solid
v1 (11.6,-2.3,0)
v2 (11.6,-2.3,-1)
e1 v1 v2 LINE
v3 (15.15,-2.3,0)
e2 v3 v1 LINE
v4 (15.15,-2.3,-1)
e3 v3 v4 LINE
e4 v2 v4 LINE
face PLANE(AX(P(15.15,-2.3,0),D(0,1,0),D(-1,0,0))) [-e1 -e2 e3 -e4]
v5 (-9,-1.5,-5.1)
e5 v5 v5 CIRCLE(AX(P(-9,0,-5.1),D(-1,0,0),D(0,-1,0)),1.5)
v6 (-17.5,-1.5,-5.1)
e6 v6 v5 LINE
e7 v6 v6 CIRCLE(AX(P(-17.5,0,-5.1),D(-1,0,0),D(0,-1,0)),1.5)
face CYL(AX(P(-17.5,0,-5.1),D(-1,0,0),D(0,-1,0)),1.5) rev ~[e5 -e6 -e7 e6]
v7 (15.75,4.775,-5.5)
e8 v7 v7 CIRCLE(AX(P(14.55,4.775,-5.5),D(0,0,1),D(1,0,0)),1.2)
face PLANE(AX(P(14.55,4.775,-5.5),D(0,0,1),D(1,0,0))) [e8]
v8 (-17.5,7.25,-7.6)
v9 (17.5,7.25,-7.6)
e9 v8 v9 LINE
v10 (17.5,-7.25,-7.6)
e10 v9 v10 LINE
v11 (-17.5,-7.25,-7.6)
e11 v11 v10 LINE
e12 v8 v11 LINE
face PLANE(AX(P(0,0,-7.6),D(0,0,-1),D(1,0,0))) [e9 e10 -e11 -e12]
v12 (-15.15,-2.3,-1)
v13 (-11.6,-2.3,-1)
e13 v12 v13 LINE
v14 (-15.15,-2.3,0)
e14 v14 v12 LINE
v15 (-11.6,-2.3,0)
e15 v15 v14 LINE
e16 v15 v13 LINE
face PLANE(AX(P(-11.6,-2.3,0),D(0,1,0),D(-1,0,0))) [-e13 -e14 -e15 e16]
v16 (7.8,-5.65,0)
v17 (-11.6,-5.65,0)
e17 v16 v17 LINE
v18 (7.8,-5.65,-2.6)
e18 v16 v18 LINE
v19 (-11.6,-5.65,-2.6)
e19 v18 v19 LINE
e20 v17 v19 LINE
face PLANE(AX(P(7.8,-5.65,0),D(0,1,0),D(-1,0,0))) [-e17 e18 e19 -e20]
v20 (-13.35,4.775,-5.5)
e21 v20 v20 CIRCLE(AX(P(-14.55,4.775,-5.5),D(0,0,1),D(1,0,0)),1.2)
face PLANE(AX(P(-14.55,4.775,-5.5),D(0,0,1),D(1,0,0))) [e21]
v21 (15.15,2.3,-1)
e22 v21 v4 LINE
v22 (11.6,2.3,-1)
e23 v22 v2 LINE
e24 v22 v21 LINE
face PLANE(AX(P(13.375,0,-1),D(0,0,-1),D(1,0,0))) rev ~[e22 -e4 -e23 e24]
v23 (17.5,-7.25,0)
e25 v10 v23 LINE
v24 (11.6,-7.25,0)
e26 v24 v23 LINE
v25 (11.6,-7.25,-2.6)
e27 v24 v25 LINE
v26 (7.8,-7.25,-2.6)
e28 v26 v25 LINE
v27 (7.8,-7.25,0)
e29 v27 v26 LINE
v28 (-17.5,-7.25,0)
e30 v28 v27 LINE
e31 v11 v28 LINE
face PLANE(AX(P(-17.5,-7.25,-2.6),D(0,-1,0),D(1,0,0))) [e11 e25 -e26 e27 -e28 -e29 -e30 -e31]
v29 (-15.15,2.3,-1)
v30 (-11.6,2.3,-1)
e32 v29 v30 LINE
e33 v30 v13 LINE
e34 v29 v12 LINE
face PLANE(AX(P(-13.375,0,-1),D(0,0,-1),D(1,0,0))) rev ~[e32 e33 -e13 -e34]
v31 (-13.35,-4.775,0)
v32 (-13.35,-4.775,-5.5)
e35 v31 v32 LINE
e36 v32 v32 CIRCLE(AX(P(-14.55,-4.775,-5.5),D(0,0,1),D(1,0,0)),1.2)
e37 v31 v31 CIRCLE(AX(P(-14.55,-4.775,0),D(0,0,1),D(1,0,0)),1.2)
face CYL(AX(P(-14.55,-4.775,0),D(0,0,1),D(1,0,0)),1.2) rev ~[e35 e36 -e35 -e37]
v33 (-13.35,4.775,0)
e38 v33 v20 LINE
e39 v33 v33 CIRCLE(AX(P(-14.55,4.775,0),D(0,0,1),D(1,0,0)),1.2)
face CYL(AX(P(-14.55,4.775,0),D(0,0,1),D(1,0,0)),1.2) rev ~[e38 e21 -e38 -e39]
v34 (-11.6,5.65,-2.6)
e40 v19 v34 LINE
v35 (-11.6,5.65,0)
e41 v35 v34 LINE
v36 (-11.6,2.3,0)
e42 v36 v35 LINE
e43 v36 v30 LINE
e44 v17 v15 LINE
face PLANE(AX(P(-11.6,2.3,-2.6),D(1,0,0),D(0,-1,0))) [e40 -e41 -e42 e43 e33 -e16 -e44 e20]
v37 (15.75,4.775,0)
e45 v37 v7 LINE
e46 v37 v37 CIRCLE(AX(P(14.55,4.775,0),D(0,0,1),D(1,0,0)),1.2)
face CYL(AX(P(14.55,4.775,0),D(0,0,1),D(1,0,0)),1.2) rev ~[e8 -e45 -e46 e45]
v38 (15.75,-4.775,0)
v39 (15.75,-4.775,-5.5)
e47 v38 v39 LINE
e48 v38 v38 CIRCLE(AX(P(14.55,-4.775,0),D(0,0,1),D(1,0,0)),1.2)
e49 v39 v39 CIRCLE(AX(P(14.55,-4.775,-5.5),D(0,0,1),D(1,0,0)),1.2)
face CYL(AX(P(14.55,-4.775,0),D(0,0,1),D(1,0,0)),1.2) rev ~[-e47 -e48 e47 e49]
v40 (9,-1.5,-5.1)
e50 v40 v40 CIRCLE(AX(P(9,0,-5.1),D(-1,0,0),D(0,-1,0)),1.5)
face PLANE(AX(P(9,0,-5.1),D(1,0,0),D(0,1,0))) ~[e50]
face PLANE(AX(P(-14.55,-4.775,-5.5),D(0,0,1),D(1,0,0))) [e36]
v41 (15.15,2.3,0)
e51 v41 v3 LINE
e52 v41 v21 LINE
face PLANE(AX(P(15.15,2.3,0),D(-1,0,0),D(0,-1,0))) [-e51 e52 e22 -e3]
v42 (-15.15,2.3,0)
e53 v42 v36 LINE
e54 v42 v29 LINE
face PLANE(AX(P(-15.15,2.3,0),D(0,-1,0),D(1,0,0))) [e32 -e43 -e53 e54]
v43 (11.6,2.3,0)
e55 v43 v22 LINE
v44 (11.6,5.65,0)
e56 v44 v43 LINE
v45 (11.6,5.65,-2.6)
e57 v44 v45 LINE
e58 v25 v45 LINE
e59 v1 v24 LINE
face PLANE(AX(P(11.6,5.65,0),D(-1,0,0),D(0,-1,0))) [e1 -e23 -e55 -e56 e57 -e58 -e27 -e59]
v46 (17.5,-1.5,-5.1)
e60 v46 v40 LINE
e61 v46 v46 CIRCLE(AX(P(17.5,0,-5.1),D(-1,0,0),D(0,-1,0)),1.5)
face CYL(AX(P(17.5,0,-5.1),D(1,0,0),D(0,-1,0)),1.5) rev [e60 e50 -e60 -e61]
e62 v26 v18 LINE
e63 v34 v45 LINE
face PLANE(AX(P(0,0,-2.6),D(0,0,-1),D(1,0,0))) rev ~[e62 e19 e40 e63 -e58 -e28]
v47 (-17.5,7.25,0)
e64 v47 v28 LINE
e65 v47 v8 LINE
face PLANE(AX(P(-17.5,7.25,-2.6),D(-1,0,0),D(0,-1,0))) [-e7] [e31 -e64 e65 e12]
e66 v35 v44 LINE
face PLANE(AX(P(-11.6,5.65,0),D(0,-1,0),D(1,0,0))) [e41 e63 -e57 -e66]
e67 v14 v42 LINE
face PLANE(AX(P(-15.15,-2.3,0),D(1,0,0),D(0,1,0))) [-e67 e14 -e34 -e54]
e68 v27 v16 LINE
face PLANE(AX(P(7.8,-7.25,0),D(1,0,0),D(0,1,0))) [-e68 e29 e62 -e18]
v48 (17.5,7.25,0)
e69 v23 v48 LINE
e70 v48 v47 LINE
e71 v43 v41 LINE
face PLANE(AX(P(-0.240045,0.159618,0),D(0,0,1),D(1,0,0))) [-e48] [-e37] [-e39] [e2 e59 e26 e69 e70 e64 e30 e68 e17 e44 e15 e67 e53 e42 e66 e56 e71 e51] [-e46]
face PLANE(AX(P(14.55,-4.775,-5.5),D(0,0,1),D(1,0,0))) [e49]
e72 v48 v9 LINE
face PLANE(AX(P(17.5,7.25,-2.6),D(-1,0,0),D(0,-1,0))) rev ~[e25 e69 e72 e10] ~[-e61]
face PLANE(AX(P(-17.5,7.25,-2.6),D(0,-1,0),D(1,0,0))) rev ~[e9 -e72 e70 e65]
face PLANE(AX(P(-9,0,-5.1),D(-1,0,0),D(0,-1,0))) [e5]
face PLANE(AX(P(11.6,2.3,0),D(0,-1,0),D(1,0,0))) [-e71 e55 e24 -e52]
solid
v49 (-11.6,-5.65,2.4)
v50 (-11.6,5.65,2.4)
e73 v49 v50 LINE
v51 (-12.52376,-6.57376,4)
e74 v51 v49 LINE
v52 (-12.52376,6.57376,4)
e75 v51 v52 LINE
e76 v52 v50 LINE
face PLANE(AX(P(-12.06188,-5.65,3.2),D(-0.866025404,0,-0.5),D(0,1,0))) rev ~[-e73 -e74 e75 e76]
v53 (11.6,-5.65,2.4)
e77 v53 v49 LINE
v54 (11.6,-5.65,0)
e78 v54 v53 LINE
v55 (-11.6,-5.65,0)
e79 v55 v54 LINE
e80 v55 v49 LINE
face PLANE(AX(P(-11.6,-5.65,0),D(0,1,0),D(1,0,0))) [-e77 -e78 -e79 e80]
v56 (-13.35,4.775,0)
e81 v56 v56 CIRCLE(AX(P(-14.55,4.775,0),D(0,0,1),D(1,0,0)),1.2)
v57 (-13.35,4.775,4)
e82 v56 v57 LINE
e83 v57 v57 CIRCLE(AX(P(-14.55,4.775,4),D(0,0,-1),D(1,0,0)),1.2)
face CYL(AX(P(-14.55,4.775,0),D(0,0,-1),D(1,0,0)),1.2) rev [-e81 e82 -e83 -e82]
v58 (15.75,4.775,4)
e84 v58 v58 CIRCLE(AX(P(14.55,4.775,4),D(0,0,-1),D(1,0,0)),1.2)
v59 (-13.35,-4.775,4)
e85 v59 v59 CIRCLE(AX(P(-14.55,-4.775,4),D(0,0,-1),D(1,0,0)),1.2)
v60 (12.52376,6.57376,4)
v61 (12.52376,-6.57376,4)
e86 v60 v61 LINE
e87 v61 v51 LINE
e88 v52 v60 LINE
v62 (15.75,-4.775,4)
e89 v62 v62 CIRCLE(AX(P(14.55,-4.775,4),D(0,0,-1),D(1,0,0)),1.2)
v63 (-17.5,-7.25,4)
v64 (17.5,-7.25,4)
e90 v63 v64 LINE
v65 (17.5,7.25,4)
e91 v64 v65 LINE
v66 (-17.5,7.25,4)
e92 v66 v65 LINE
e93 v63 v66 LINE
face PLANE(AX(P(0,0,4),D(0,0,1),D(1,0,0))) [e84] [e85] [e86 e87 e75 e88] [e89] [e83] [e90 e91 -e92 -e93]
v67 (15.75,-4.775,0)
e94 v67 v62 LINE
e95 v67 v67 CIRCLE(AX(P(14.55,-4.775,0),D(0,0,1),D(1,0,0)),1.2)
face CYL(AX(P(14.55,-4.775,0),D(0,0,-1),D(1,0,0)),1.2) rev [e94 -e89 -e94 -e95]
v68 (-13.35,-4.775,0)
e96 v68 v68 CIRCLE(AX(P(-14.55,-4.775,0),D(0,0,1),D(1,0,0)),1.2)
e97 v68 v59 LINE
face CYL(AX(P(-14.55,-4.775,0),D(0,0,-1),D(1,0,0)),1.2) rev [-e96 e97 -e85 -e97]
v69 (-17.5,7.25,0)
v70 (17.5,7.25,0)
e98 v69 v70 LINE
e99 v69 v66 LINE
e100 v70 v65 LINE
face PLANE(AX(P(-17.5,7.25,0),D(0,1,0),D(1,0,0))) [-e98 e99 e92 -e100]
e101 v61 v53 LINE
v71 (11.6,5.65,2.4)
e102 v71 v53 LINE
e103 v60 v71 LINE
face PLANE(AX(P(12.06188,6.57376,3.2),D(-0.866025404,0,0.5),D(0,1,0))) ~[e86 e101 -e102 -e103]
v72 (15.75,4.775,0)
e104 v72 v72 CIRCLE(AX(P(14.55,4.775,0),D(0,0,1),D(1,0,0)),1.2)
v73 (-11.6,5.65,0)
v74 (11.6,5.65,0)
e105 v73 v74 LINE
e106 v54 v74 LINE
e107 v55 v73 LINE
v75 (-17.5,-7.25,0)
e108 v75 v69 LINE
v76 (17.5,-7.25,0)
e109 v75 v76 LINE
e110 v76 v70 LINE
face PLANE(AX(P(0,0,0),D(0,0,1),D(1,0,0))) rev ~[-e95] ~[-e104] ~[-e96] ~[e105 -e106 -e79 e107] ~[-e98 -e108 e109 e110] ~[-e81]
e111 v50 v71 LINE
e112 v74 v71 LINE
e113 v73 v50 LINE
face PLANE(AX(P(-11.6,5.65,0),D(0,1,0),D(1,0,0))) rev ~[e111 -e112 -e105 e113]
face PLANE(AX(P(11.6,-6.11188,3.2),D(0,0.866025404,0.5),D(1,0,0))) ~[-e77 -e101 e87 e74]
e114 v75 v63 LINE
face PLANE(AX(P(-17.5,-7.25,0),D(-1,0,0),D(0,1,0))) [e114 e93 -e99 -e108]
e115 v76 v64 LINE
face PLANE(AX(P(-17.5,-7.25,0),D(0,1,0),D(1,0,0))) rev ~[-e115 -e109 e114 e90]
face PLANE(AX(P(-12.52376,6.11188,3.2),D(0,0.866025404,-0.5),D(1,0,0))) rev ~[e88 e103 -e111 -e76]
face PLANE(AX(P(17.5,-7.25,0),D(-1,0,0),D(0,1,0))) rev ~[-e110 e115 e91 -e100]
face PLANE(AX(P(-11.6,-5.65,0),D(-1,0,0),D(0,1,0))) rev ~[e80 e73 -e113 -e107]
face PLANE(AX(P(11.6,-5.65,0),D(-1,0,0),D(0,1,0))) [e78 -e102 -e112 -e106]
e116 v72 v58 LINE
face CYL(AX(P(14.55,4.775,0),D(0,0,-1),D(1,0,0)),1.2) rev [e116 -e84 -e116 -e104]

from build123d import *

# Parameters (mm, degrees)
F1_DEPTH       = 2.6
F2_W           = 3.55
F2_H           = 4.6
F3_DEPTH       = 1.6
F4_W           = 35
F4_H           = 14.5
F5_DEPTH       = 5
F6_R           = 1.5
F7_DEPTH       = 8.5
F8_W           = 35
F8_H           = 14.5
F8_W_2         = 23.2
F8_H_2         = 11.3
F9_DEPTH       = 4
F10_R          = 1.2
F11_DEPTH      = 5.5
F11_DEPTH_BACK = 4.001
F12_C1_SIZE2   = 1.6
F12_C1_SIZE    = 0.9237604307
F12_C2_SIZE2   = 1.6
F12_C2_SIZE    = 0.9237604307
F12_C3_SIZE2   = 1.6
F12_C3_SIZE    = 0.9237604307
F12_C4_SIZE2   = 1.6
F12_C4_SIZE    = 0.9237604307


# Not quite as in the source:
# - a pattern or mirror of a feature is missing from the dataset's text; its kind, count and spacing are read off the source's solid


with BuildPart() as f1:
    # F0 (on Top) → F1 (new body)
    with BuildSketch(Plane.XY):
        Polygon((17.5, -7.25), (17.5, 7.25), (-17.5, 7.25), (-17.5, -7.25), (7.8, -7.25), (7.8, -5.65), (-11.6, -5.65), (-11.6, -2.3), (-15.15, -2.3), (-15.15, 2.3), (-11.6, 2.3), (-11.6, 5.65), (11.6, 5.65), (11.6, 2.3), (15.15, 2.3), (15.15, -2.3), (11.6, -2.3), (11.6, -7.25), align=None)
    extrude(amount=-F1_DEPTH)

    # F2 (on face) → F3 (join, through all)
    with BuildSketch(Plane(origin=(0, 0, -2.6), x_dir=(1, 0, 0), z_dir=(0, 0, -1))):
        with Locations((-13.375, 0)):
            Rectangle(F2_W, F2_H)
        with Locations((13.375, 0)):
            Rectangle(F2_W, F2_H)
    extrude(amount=-F3_DEPTH)

    # F4 (on face) → F5 (join)
    with BuildSketch(Plane(origin=(0, 0, -2.6), x_dir=(1, 0, 0), z_dir=(0, 0, -1))):
        Rectangle(F4_W, F4_H)
    extrude(amount=F5_DEPTH)

    # F6 (on face) → F7 (cut)
    with BuildSketch(Plane(origin=(-17.5, 0, 0), x_dir=(0, -1, 0), z_dir=(-1, 0, 0))):
        with Locations((0, -5.1)):
            Circle(F6_R)
    f7 = extrude(amount=-F7_DEPTH, mode=Mode.SUBTRACT)

    # F7_copies: F7 across plane
    add(f7.mirror(Plane(origin=(0, 0, 0), x_dir=(0, 0, 1), z_dir=(1, 0, 0))), mode=Mode.SUBTRACT)


with BuildPart() as f9:
    # F8 (on face) → F9 (new body)
    with BuildSketch(Plane.XY):
        Rectangle(F8_W, F8_H)
        Rectangle(F8_W_2, F8_H_2, mode=Mode.SUBTRACT)
    extrude(amount=F9_DEPTH)


with BuildPart() as f11_tool:
    # F10 (on face) → F11 (new body, two sides)
    with BuildSketch(Plane.XY) as f11_sk:
        with Locations((-14.55, 4.775)):
            Circle(F10_R)
        with Locations((14.55, 4.775)):
            Circle(F10_R)
        with Locations((-14.55, -4.775)):
            Circle(F10_R)
        with Locations((14.55, -4.775)):
            Circle(F10_R)
    extrude(amount=-F11_DEPTH)
    extrude(f11_sk.sketch, amount=F11_DEPTH_BACK)


with BuildPart() as f1_1:
    add(f1.part)

    # F11: cut by f11_tool
    add(f11_tool.part, mode=Mode.SUBTRACT)


with BuildPart() as f9_1:
    add(f9.part)

    # F11: cut by f11_tool
    add(f11_tool.part, mode=Mode.SUBTRACT)

    # F12: chamfer of 1.6 x 0.9237604307 on 4 edges, made by hand

    # F12_c1
    f12_c1_edges = [f9_1.edges().sort_by_distance(p)[0] for p in [
        (-11.6, 0, 4),
    ]]
    f12_c1_side = f9_1.faces().sort_by_distance((-11.6184752086, 0, 4))[0]
    chamfer(f12_c1_edges, length=F12_C1_SIZE, length2=F12_C1_SIZE2, reference=f12_c1_side)

    # F12_c2
    f12_c2_edges = [f9_1.edges().sort_by_distance(p)[0] for p in [
        (0, -5.65, 4),
    ]]
    f12_c2_side = f9_1.faces().sort_by_distance((0, -5.6684752086, 4))[0]
    chamfer(f12_c2_edges, length=F12_C2_SIZE, length2=F12_C2_SIZE2, reference=f12_c2_side)

    # F12_c3
    f12_c3_edges = [f9_1.edges().sort_by_distance(p)[0] for p in [
        (0, 5.65, 4),
    ]]
    f12_c3_side = f9_1.faces().sort_by_distance((0, 5.6684752086, 4))[0]
    chamfer(f12_c3_edges, length=F12_C3_SIZE, length2=F12_C3_SIZE2, reference=f12_c3_side)

    # F12_c4
    f12_c4_edges = [f9_1.edges().sort_by_distance(p)[0] for p in [
        (11.6, 0, 4),
    ]]
    f12_c4_side = f9_1.faces().sort_by_distance((11.6184752086, 0, 4))[0]
    chamfer(f12_c4_edges, length=F12_C4_SIZE, length2=F12_C4_SIZE2, reference=f12_c4_side)


solid = Compound([f1_1.part, f9_1.part])
